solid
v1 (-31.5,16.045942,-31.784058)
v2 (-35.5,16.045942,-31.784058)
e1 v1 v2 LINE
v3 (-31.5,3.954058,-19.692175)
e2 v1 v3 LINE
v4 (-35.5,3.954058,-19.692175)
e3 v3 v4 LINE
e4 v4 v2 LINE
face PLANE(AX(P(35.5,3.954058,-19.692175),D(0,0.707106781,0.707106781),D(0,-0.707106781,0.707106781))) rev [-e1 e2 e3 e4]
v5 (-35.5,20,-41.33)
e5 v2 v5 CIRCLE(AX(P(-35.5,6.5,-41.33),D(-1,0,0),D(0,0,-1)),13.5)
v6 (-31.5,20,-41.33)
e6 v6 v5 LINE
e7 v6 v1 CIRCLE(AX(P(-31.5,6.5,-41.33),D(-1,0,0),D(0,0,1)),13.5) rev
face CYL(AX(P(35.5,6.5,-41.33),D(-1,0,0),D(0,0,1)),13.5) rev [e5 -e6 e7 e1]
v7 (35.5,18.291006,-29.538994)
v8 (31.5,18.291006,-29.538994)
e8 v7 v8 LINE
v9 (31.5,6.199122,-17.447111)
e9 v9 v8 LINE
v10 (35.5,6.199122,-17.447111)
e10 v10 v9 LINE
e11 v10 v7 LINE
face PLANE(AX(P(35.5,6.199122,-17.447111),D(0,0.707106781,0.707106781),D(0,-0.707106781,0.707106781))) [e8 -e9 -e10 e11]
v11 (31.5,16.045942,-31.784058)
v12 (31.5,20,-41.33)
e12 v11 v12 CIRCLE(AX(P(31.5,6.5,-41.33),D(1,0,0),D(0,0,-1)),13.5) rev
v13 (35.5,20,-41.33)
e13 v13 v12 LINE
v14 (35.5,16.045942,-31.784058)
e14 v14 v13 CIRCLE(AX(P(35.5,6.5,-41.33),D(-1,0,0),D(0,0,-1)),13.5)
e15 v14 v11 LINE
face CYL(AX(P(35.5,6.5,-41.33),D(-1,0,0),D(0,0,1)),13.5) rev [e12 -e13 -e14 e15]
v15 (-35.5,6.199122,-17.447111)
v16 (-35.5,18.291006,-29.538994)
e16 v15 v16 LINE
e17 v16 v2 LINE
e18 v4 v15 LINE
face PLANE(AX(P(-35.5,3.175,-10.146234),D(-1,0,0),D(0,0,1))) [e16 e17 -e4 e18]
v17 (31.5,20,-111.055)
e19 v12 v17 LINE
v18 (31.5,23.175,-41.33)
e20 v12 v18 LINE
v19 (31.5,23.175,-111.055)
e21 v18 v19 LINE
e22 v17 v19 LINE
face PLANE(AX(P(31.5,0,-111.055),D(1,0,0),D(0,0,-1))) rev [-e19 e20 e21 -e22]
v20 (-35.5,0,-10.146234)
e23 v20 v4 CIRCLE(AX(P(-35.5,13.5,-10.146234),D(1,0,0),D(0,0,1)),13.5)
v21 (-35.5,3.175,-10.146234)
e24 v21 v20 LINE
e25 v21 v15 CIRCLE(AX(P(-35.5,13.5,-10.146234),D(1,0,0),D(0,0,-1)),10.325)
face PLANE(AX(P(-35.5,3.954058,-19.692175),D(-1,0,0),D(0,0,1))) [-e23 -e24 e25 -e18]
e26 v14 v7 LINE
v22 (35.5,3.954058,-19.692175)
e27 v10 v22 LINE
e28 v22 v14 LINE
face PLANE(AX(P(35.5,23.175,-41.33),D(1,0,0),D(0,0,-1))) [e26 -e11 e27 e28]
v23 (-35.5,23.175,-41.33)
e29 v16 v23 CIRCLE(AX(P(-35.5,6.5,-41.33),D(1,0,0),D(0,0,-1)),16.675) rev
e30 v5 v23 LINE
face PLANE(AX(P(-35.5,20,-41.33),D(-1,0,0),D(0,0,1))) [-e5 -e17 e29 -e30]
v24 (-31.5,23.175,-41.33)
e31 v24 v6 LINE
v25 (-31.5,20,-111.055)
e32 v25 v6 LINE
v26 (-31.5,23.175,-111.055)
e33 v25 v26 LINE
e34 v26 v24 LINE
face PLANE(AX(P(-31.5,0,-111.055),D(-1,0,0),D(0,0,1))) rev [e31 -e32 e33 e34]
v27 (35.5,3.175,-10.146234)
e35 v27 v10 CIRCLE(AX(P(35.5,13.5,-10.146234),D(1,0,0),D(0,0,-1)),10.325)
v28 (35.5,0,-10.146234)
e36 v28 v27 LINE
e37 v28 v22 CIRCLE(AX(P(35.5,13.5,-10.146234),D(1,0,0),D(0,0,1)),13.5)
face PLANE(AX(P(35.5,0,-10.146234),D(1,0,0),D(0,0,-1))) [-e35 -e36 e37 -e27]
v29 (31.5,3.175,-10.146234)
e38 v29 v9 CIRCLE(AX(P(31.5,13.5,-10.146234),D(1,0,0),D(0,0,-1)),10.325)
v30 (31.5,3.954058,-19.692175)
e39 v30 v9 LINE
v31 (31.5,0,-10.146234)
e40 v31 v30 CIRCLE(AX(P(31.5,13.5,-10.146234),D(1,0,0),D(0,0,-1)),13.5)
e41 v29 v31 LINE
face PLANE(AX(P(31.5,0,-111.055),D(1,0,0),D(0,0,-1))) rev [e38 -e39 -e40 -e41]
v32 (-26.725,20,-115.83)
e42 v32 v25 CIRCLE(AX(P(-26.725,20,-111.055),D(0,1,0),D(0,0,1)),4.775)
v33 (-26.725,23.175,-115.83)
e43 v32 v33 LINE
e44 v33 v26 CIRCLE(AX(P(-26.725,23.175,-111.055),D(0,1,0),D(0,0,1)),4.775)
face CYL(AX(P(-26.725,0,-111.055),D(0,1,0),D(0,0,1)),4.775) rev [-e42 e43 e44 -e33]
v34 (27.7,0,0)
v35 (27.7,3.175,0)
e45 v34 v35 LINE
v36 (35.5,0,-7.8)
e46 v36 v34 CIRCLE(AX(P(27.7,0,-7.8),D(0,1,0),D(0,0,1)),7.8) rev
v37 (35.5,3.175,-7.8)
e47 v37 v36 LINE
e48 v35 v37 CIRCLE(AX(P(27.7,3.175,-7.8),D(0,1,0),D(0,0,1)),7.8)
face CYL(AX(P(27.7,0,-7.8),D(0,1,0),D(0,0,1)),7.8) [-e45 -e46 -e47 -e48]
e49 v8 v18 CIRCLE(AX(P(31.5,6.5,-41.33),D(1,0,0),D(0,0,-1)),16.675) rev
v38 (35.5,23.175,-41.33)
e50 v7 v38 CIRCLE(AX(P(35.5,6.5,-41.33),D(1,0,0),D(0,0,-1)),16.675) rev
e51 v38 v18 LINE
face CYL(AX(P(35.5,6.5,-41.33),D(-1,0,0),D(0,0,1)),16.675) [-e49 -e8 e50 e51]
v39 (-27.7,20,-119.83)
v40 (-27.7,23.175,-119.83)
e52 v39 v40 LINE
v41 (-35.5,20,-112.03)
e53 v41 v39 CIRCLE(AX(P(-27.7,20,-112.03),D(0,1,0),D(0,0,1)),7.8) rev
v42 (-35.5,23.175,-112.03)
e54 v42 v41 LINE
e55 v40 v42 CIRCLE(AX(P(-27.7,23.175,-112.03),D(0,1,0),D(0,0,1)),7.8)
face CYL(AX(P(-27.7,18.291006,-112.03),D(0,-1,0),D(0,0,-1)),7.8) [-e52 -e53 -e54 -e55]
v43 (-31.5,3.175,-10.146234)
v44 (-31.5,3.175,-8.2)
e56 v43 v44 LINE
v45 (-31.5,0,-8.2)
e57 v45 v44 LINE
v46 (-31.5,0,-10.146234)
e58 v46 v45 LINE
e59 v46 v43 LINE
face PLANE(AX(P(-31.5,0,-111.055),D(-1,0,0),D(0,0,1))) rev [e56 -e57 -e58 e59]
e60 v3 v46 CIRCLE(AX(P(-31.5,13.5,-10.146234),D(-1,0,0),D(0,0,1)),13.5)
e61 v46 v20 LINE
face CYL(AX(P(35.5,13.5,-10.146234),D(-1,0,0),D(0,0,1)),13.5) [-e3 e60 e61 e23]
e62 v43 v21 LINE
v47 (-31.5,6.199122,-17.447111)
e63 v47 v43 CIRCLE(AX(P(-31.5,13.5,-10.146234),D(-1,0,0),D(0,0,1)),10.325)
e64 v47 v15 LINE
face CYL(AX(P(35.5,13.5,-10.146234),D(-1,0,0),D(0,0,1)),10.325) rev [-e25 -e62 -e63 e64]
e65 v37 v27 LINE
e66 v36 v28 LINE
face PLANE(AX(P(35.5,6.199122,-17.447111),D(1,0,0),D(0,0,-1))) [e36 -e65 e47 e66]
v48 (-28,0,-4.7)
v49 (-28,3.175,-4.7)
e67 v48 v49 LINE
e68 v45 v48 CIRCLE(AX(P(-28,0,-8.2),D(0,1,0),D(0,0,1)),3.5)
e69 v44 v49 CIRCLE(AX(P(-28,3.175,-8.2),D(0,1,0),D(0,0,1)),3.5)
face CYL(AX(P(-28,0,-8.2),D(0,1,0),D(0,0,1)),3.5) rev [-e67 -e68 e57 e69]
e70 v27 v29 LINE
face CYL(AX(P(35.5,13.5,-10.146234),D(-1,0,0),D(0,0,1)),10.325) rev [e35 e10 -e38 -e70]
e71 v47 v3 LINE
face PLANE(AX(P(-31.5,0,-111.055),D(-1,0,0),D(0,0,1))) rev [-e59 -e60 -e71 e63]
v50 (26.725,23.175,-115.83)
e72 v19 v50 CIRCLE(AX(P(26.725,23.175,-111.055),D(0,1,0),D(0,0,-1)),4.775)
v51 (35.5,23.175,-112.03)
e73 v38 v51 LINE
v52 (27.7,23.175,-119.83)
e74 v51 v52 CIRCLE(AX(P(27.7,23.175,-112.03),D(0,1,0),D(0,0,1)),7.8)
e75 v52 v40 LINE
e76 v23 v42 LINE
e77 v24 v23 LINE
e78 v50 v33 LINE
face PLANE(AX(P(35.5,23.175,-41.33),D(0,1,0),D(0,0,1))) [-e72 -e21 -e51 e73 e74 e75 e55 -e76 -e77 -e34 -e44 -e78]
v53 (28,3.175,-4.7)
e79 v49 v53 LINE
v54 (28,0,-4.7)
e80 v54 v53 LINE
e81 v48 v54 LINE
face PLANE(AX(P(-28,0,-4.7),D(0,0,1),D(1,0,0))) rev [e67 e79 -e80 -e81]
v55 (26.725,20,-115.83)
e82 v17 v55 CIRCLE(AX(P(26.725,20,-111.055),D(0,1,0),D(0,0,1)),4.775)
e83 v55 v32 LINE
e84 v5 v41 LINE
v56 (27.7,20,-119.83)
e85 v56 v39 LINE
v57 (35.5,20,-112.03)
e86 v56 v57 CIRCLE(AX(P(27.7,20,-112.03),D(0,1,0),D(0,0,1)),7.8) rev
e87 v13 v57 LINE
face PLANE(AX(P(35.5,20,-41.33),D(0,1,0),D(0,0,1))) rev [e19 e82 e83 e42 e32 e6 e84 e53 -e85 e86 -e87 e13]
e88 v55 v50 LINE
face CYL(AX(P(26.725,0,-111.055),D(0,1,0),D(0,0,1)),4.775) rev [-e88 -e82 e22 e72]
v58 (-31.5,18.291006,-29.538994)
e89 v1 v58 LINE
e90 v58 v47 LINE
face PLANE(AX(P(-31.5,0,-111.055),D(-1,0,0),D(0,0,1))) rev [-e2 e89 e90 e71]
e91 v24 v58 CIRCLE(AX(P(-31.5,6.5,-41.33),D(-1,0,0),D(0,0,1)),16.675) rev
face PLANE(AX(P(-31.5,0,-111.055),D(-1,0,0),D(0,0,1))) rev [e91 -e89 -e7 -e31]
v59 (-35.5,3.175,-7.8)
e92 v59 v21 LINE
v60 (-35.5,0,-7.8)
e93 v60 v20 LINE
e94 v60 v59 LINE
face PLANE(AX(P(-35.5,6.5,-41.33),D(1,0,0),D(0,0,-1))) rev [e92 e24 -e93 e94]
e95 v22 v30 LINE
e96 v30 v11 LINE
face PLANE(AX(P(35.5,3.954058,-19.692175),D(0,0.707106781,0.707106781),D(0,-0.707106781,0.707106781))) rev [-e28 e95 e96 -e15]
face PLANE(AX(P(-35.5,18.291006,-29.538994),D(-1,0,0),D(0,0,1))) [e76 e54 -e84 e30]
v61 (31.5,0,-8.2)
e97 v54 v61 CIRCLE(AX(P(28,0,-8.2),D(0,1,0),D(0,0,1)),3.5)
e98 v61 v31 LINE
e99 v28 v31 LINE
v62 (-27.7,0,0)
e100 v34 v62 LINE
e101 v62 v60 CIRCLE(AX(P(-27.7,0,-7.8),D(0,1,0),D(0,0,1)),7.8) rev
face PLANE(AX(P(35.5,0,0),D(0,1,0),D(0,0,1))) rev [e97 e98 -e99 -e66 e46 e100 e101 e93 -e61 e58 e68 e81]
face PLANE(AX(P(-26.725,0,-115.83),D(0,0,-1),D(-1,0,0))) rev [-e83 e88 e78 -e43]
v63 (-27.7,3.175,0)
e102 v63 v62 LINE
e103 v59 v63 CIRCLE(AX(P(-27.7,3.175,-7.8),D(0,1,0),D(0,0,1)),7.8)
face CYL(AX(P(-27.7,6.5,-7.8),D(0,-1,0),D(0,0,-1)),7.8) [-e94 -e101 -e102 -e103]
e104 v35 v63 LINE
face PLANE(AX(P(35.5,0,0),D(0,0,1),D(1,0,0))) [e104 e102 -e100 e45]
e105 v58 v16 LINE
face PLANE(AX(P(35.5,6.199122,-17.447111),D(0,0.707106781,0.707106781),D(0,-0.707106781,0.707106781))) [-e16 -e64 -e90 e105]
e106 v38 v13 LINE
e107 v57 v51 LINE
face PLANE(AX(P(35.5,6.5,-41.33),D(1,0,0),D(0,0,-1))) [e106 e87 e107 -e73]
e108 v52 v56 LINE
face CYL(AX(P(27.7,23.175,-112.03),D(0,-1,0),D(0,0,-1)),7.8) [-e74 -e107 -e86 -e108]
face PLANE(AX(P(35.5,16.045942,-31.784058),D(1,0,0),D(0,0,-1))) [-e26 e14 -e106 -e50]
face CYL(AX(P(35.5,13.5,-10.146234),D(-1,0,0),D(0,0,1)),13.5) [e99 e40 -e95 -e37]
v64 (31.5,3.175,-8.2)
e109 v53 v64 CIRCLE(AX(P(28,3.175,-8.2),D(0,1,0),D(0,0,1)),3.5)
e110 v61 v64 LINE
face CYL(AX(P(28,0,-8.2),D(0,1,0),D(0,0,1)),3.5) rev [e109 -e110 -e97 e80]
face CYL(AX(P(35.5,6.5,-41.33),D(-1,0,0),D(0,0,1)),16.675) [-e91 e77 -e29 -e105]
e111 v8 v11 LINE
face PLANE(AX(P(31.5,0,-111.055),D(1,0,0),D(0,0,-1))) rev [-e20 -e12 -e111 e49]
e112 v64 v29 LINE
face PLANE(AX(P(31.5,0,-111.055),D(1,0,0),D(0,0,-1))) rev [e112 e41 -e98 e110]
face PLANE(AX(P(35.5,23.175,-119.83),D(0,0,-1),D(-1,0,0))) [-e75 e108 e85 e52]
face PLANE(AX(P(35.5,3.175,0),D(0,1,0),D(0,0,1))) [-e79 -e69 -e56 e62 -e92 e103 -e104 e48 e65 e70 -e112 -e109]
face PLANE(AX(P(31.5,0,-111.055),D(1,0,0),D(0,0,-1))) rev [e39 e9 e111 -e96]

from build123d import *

# Parameters (mm, degrees)
BASE_FLANGE3_DEPTH = 35.5
FILLET1_R          = 7.8
CUT_EXTRUDE1_DEPTH = 128.108455757


# Sheet-metal steps are written as plain solids
with BuildPart() as part:
    # Sketch1 → Base-Flange3 (new, symmetric)
    with BuildSketch(Plane(origin=(0, 0, 0), x_dir=(0, 0, -1), z_dir=(1, 0, 0))):
        with BuildLine():
            Line((0, 0), (10.146233816, 0))
            ThreePointArc((10.146233816, 0), (15.312460153, 1.027626311), (19.692175362, 3.954058454))
            Line((19.692175362, 3.954058454), (31.784058454, 16.045941546))
            ThreePointArc((31.784058454, 16.045941546), (36.163773663, 18.972373689), (41.33, 20))
            Line((41.33, 20), (119.83, 20))
            Line((119.83, 20), (119.83, 23.175))
            Line((119.83, 23.175), (41.33, 23.175))
            ThreePointArc((41.33, 23.175), (34.948753765, 21.905691205), (29.538994424, 18.291005576))
            Line((29.538994424, 18.291005576), (17.447111332, 6.199122484))
            ThreePointArc((17.447111332, 6.199122484), (14.097440255, 3.960943827), (10.146233816, 3.175))
            Line((10.146233816, 3.175), (0, 3.175))
            Line((0, 3.175), (0, 0))
        make_face()
    extrude(amount=BASE_FLANGE3_DEPTH, both=True)

    # Fillet1
    fillet1_edges = [part.edges().sort_by_distance(p)[0] for p in [
        (-35.5, 1.5875, 0),
        (-35.5, 21.5875, -119.83),
        (35.5, 1.5875, 0),
        (35.5, 21.5875, -119.83),
    ]]
    fillet(fillet1_edges, radius=FILLET1_R)

    # Sketch15 → Cut-Extrude1 (cut, through all)
    with BuildSketch(Plane(origin=(0, 23.175, 0), x_dir=(1, 0, 0), z_dir=(0, 1, 0))):
        with BuildLine():
            Line((-26.725, 115.83), (26.725, 115.83))
            ThreePointArc((26.725, 115.83), (30.10143488, 114.43143488), (31.5, 111.055))
            Line((31.5, 111.055), (31.5, 8.2))
            ThreePointArc((31.5, 8.2), (30.474873734, 5.725126266), (28, 4.7))
            Line((28, 4.7), (-28, 4.7))
            ThreePointArc((-28, 4.7), (-30.474873734, 5.725126266), (-31.5, 8.2))
            Line((-31.5, 8.2), (-31.5, 111.055))
            ThreePointArc((-31.5, 111.055), (-30.10143488, 114.43143488), (-26.725, 115.83))
        make_face()
    extrude(amount=-CUT_EXTRUDE1_DEPTH, mode=Mode.SUBTRACT)


solid = part.part
